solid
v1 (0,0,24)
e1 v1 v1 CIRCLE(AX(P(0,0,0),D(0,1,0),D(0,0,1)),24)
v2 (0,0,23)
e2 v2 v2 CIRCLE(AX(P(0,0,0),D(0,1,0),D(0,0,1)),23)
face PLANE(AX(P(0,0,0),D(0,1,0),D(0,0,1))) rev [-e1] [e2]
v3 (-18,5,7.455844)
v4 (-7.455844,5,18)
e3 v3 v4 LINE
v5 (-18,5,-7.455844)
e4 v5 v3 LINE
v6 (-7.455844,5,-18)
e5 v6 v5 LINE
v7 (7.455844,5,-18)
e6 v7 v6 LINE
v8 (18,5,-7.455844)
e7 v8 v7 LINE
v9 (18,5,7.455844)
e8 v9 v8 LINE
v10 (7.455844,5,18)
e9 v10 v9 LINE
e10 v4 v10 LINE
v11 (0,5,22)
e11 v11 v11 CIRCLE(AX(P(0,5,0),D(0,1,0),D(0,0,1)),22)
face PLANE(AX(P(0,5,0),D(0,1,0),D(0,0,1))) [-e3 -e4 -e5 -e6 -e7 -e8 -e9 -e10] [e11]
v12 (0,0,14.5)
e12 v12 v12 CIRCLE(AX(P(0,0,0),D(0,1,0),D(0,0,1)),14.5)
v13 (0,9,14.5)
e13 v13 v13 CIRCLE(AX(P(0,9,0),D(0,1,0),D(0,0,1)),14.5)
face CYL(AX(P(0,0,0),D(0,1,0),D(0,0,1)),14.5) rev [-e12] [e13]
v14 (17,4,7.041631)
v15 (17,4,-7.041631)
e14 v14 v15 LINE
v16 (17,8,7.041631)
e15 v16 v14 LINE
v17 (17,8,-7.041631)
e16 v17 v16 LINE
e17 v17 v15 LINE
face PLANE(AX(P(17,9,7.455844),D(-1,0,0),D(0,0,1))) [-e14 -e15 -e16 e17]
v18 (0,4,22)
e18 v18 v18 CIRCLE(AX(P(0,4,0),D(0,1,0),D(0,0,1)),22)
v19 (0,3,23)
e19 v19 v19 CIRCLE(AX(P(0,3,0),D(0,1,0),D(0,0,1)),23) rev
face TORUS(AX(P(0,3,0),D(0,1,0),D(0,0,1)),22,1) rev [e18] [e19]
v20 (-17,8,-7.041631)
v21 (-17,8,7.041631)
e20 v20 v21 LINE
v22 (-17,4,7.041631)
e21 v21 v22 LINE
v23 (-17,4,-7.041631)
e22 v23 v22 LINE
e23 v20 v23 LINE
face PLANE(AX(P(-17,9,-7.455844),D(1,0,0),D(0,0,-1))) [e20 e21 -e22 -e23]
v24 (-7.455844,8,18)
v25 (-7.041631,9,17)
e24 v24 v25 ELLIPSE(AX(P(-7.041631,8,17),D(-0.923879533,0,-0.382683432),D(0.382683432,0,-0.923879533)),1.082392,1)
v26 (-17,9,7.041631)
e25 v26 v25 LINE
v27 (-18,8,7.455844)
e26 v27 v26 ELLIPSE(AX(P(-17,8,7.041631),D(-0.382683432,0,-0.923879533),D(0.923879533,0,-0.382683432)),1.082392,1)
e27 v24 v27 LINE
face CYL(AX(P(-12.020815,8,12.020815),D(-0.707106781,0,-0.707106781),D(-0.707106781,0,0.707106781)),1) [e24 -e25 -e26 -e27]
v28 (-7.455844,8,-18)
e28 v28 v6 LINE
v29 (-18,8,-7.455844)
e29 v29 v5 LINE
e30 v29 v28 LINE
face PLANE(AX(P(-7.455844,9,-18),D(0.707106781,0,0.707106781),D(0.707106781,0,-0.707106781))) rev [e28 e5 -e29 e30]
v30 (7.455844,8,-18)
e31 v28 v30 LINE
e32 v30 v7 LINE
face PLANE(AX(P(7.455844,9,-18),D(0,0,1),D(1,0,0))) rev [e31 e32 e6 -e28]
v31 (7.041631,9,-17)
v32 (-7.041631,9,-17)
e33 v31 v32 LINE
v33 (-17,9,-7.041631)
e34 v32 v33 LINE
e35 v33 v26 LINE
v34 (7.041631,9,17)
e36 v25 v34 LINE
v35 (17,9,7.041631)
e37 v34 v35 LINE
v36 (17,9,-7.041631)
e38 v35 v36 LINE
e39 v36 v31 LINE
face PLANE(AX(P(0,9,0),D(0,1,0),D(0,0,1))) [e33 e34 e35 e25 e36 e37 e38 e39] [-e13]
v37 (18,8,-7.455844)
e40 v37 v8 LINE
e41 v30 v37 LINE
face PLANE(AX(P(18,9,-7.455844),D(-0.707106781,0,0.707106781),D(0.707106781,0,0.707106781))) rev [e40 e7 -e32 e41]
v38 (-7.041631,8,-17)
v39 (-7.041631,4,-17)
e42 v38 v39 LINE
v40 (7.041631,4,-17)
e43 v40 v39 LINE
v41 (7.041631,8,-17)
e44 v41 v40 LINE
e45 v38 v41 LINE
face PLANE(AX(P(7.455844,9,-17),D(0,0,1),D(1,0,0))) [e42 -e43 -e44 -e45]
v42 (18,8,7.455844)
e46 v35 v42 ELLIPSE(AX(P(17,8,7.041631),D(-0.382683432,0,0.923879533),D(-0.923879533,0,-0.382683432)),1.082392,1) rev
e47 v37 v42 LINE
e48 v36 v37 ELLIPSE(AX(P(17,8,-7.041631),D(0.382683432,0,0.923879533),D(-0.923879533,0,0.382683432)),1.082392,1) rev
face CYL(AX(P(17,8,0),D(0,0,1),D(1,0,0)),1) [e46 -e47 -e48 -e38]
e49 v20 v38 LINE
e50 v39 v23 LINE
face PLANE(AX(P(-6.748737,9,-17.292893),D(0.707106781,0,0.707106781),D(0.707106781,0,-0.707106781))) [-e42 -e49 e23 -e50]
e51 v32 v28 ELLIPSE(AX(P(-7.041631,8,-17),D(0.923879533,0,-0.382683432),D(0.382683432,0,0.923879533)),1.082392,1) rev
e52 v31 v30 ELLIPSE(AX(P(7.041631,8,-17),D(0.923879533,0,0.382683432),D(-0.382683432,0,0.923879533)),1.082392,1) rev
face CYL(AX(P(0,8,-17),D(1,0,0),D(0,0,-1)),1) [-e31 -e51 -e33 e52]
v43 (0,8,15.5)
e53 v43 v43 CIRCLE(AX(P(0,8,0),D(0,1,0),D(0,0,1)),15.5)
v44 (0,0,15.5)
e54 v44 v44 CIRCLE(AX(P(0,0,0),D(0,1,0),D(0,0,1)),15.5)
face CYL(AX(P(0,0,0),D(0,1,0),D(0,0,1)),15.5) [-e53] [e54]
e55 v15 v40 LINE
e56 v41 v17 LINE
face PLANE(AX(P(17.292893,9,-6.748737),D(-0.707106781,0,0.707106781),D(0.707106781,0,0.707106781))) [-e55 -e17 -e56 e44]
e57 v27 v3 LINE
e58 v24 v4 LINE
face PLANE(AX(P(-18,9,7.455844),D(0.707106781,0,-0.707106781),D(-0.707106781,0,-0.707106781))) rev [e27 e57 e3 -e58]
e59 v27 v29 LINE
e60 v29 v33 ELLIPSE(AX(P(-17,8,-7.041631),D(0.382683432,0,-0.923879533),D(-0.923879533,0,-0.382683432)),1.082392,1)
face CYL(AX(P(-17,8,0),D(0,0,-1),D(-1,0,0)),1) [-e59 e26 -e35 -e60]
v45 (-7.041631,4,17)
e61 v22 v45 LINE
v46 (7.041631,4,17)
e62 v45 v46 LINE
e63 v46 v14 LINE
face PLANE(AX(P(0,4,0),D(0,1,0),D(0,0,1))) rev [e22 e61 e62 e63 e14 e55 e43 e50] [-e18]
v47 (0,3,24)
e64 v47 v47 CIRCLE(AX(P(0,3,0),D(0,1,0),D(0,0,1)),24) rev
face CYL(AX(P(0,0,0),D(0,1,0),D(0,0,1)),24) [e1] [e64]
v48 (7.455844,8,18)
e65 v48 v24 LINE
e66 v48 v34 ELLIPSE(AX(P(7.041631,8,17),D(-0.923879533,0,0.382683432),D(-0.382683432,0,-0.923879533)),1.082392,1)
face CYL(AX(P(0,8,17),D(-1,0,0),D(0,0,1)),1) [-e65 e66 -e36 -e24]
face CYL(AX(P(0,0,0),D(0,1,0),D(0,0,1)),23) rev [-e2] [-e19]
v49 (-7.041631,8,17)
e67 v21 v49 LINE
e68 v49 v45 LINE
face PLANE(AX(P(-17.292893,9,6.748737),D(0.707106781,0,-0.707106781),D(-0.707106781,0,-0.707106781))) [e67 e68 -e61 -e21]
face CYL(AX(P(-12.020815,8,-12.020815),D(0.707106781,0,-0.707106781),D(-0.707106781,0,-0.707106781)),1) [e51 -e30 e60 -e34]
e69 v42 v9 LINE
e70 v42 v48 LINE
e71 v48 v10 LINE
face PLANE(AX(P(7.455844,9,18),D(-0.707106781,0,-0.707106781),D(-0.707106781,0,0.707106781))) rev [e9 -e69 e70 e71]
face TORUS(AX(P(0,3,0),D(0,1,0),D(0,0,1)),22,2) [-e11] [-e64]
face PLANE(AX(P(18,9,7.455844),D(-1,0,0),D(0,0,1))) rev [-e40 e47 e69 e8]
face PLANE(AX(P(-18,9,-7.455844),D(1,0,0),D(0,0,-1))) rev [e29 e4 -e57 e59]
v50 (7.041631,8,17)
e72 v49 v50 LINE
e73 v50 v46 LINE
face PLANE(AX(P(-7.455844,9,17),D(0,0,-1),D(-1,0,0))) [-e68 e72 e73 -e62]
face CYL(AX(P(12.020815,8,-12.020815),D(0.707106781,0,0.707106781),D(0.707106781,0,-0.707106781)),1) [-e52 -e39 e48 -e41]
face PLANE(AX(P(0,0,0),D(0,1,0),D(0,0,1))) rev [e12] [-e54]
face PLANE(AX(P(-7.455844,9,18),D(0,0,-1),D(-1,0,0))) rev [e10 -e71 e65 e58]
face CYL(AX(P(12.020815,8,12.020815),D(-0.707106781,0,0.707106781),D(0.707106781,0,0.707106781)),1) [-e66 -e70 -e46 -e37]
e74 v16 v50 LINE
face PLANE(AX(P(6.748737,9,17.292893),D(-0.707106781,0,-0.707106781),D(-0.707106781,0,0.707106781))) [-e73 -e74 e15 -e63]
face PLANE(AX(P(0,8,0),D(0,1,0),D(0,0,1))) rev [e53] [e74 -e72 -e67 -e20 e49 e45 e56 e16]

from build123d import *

# Parameters (mm, degrees)
SALIENTE_EXTRUIR1_DEPTH = 9
CROQUIS2_R              = 14.5
CORTAR_EXTRUIR1_DEPTH   = 28
REDONDEO1_R             = 1
CROQUIS4_R              = 24
SALIENTE_EXTRUIR2_DEPTH = 5
CROQUIS5_R              = 14.5
CORTAR_EXTRUIR2_DEPTH   = 35.307433597
REDONDEO2_R             = 2
VACIADO1_OUTLINE_R      = 23
VACIADO1_OUTLINE_R_2    = 15.5
VACIADO1_DEPTH          = 2.9999999
VACIADO1_2_OUTLINE_R    = 15.5
VACIADO1_2_DEPTH        = 8


with BuildPart() as part:
    # Croquis1 → Saliente-Extruir1 (new body)
    with BuildSketch(Plane(origin=(0, 0, 0), x_dir=(1, 0, 0), z_dir=(0, 1, 0))):
        Polygon((18, 7.455844123), (7.455844123, 18), (-7.455844123, 18), (-18, 7.455844123), (-18, -7.455844123), (-7.455844123, -18), (7.455844123, -18), (18, -7.455844123), align=None)
    extrude(amount=SALIENTE_EXTRUIR1_DEPTH)

    # Croquis2 → Cortar-Extruir1 (cut, through all)
    with BuildSketch(Plane(origin=(0, 9, 0), x_dir=(1, 0, 0), z_dir=(0, 1, 0))):
        with Locations(Location((0, 0, 0), (0, 0, 270))):
            Circle(CROQUIS2_R)
    extrude(amount=-CORTAR_EXTRUIR1_DEPTH, mode=Mode.SUBTRACT)

    # Redondeo1
    redondeo1_edges = [part.edges().sort_by_distance(p)[0] for p in [
        (0, 9, -18),
        (-12.727922061, 9, -12.727922061),
        (-18, 9, 0),
        (-12.727922061, 9, 12.727922061),
        (0, 9, 18),
        (12.727922061, 9, 12.727922061),
        (18, 9, 0),
        (12.727922061, 9, -12.727922061),
    ]]
    fillet(redondeo1_edges, radius=REDONDEO1_R)

    # Croquis4 → Saliente-Extruir2 (add)
    with BuildSketch(Plane(origin=(0, 5, 0), x_dir=(1, 0, 0), z_dir=(0, 1, 0))):
        with Locations(Location((0, 0, 0), (0, 0, 270))):
            Circle(CROQUIS4_R)
    extrude(amount=-SALIENTE_EXTRUIR2_DEPTH)

    # Croquis5 → Cortar-Extruir2 (cut, through all)
    with BuildSketch(Plane(origin=(0, 5, 0), x_dir=(1, 0, 0), z_dir=(0, 1, 0))):
        with Locations(Location((0, 0, 0), (0, 0, 270))):
            Circle(CROQUIS5_R)
    extrude(amount=-CORTAR_EXTRUIR2_DEPTH, mode=Mode.SUBTRACT)

    # Redondeo2
    redondeo2_edges = [part.edges().sort_by_distance(p)[0] for p in [
        (0, 5, -24),
    ]]
    fillet(redondeo2_edges, radius=REDONDEO2_R)

    # Vaciado1: read off the stored shape, not the designer's step
    # Vaciado1 outline → Vaciado1 (cut)
    with BuildSketch(Plane(origin=(0, 0, 0), x_dir=(1, 0, 0), z_dir=(0, 1, 0))):
        Circle(VACIADO1_OUTLINE_R)
        Circle(VACIADO1_OUTLINE_R_2, mode=Mode.SUBTRACT)
    extrude(amount=VACIADO1_DEPTH, mode=Mode.SUBTRACT)

    # Vaciado1 2 outline → Vaciado1 2 (cut)
    with BuildSketch(Plane(origin=(0, 0, 0), x_dir=(1, 0, 0), z_dir=(0, 1, 0))):
        Polygon((17, -7.04163056), (17, 7.04163056), (7.04163056, 17), (-7.04163056, 17), (-17, 7.04163056), (-17, -7.04163056), (-7.04163056, -17), (7.04163056, -17), align=None)
        Circle(VACIADO1_2_OUTLINE_R, mode=Mode.SUBTRACT)
    extrude(amount=VACIADO1_2_DEPTH, mode=Mode.SUBTRACT)

    # Vaciado1 3 outline → Vaciado1 3 (revolve, cut)
    with BuildSketch(Plane.XY):
        with BuildLine():
            Line((17, 2.9999999), (23, 3))
            ThreePointArc((23, 3), (22.707106781, 3.707106781), (22, 4))
            Line((22, 4), (17, 4))
            Line((17, 4), (17, 2.9999999))
        make_face()
    revolve(axis=Axis((0, 0, 0), (0, 1, 0)), mode=Mode.SUBTRACT)


solid = part.part
